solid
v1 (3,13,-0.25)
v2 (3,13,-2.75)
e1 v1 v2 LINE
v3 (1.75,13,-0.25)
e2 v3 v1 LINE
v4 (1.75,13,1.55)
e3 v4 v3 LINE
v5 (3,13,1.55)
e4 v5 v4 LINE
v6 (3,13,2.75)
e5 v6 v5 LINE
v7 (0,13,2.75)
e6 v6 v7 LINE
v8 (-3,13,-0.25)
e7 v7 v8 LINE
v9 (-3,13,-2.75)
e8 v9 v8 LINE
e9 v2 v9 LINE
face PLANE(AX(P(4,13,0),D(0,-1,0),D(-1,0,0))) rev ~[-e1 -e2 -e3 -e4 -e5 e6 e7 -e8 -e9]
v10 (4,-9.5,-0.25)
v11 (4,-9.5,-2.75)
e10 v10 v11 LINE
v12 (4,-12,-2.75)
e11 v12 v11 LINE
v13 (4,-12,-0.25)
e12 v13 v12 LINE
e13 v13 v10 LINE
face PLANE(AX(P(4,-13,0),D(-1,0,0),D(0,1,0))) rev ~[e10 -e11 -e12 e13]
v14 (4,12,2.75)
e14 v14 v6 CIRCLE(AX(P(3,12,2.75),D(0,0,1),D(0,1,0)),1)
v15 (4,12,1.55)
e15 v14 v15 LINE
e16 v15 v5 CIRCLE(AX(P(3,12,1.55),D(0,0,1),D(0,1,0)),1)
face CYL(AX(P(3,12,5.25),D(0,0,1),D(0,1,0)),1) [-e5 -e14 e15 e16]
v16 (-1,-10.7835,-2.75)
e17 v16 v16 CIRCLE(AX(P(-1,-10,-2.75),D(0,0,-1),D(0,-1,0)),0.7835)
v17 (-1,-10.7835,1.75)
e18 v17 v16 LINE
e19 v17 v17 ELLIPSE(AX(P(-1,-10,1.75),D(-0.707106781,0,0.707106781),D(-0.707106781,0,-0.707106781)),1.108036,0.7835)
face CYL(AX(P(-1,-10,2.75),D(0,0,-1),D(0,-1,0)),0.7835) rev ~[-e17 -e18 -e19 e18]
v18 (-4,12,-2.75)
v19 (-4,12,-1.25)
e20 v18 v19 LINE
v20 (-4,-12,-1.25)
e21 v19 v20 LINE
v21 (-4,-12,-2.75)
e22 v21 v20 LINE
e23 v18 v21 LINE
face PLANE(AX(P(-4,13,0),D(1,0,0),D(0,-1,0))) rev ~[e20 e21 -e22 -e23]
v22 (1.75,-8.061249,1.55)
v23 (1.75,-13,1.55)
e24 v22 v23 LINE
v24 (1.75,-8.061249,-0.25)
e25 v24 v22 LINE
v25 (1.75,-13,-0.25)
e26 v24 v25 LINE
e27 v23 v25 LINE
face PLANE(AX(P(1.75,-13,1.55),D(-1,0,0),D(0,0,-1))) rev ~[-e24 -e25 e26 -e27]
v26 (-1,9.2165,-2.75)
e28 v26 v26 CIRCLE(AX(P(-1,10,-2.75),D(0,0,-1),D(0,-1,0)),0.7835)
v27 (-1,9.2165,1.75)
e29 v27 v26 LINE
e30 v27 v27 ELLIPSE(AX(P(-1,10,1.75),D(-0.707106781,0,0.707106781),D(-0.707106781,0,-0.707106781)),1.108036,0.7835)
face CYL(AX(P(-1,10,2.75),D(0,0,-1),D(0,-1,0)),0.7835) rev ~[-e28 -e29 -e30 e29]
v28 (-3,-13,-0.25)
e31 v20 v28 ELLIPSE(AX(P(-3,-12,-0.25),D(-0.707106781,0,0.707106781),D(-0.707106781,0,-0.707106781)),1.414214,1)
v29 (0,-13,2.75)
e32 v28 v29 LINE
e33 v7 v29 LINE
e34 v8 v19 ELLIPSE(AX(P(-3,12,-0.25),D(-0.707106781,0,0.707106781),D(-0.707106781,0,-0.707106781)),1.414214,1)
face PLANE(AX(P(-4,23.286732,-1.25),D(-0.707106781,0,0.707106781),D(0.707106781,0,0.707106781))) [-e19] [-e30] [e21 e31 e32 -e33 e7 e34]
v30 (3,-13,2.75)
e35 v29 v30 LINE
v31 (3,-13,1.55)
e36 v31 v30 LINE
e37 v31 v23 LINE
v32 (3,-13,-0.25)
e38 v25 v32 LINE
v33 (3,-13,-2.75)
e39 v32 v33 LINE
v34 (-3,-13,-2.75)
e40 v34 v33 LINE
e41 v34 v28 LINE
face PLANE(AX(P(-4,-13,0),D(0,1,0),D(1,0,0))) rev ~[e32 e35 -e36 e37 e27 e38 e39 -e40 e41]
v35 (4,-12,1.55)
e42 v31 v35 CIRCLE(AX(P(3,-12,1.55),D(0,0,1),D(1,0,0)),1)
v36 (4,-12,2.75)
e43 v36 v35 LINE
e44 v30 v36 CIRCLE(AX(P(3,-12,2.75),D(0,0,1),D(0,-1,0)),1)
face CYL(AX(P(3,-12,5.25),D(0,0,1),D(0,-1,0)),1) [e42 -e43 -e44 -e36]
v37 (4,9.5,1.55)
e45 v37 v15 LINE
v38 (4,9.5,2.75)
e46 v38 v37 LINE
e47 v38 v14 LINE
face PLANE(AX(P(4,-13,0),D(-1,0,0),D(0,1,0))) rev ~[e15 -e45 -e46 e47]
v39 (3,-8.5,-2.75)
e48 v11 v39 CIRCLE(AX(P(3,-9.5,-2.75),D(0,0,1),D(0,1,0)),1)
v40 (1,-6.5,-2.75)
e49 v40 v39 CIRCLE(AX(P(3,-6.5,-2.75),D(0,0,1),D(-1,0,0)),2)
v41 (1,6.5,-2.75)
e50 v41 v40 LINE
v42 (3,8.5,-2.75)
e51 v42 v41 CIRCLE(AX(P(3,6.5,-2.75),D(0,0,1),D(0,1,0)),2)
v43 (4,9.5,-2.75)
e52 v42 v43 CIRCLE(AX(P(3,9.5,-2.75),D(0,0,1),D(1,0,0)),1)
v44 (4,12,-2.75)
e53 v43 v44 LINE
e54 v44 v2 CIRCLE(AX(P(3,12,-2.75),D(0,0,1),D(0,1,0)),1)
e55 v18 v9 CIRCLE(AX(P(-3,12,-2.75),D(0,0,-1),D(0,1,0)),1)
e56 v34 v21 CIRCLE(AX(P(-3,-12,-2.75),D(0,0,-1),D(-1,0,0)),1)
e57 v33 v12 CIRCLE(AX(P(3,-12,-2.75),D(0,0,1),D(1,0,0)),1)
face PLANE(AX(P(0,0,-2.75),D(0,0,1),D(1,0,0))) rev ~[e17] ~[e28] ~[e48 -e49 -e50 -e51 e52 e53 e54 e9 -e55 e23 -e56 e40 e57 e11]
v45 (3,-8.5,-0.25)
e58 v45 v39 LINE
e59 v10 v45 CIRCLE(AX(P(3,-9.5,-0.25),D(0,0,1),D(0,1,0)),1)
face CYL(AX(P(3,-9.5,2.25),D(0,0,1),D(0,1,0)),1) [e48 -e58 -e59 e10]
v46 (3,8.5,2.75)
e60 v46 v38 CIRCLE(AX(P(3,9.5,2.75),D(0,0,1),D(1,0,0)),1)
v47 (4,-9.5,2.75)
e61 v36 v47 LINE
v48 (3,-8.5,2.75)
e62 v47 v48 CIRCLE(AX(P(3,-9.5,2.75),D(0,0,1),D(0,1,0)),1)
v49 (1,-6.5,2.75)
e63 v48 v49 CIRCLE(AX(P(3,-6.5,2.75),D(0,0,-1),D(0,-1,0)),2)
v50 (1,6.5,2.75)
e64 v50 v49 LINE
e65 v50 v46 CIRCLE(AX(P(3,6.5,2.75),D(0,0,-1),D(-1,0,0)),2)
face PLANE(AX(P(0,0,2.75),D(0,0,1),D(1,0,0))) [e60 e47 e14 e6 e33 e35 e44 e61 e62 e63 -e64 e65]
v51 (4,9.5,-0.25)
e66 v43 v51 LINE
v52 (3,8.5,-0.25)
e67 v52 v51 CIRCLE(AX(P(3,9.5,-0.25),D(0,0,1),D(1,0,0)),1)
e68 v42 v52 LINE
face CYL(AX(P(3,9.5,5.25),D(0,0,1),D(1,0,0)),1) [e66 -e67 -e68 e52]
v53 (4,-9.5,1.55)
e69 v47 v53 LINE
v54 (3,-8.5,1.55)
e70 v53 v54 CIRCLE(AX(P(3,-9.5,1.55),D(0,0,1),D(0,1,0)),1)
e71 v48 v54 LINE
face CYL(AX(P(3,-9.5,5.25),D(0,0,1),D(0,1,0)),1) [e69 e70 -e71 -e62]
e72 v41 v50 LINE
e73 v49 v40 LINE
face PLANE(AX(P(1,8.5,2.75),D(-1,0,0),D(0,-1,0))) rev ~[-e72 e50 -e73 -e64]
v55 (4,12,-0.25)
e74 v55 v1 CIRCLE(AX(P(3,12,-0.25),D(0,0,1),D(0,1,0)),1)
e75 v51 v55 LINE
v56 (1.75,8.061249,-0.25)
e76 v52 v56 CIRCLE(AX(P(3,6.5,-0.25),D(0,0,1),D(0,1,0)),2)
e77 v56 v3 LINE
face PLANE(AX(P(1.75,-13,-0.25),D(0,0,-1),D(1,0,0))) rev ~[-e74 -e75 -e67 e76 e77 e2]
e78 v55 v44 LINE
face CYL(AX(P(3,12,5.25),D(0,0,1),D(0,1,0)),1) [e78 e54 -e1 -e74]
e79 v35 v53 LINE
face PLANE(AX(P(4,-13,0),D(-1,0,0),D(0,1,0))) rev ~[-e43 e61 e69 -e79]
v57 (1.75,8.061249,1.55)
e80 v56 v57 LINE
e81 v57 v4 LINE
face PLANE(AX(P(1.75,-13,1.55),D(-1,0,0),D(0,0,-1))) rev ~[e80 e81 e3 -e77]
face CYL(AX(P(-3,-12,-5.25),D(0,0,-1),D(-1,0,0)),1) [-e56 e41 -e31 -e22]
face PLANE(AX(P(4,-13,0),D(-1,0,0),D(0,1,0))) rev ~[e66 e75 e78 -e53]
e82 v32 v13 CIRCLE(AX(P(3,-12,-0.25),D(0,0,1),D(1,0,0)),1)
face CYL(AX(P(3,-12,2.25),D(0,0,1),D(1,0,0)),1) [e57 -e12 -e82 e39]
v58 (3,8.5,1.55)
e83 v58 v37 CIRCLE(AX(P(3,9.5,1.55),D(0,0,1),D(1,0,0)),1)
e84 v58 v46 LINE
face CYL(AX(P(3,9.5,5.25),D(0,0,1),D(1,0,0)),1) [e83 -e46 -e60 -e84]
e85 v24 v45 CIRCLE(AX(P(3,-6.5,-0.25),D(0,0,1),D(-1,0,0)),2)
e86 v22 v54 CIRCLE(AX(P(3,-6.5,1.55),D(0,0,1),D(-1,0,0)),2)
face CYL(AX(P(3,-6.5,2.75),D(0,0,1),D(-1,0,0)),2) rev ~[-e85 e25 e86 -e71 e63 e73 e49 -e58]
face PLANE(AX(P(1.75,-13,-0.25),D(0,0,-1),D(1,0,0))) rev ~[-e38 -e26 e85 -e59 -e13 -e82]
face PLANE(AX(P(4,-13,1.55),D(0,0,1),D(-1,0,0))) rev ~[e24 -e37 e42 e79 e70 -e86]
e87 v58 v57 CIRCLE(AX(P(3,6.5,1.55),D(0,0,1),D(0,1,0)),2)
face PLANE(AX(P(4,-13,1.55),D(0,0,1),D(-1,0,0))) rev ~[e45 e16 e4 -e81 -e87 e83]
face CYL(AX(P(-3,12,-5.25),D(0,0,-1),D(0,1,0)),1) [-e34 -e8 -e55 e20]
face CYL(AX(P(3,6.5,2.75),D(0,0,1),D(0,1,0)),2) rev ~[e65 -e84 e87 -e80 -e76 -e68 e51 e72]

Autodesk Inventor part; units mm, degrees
ref_plane "YZ Plane" through (0, 0, 0) normal (1, 0, 0) x (0, 1, 0)
ref_plane "XZ Plane" through (0, 0, 0) normal (0, 1, 0) x (-1, 0, 0)
ref_plane "XY Plane" through (0, 0, 0) normal (0, 0, 1) x (1, 0, 0)
sketch "Sketch1" plane through (0, 0, 0) normal (0, 0, 1) x (1, 0, 0)
  line L0 (-4, 13) -> (-4, -13)
  line L1 (-4, -13) -> (4, -13)
  line L2 (4, -13) -> (4, 13)
  line L3 (4, 13) -> (-4, 13)
  line L4 (-1, -10) -> (-1, 10) construction
  circle A0 centre (-1, 10) radius 3 construction
  point P0 (0, 0)
  point P1 (0, 13)
  point P2 (-4, 0)
  point P3 (-1, 0)
  dimension "d0" = 26
  dimension "d2" = 20
  dimension "d5" = 5
extrude "Extrusion1" add sketch "Sketch1" along normal mid plane 5.5
sketch "Sketch2" plane through (0, 0, 2.75) normal (0, 0, 1) x (1, 0, 0)
  point P0 (0, 0)
  point P1 (-1, 10)
  point P2 (-1, -10)
hole "Hole1" at (-1, 10, 2.75) at (-1, -10, 2.75) direction (0, 0, -1) diameter 1.567 end through all thread size "M2x0.4" class "6H" standard "ANSI Metric M Profile"
sketch "Sketch3" plane through (-4, -13, 2.75) normal (0, -1, 0) x (1, 0, 0)
  line L0 (8, -5.5) -> (8, 0) projected
  line L1 (0, 0) -> (8, 0) projected
  line L2 (0, -5.5) -> (0, 0) projected
  line L3 (8, -5.5) -> (0, -5.5) projected
  line L4 (8, -5.5) -> (8, 0) projected
  line L5 (8, -1.2) -> (5.75, -1.2)
  line L6 (5.75, -1.2) -> (5.75, -3)
  line L7 (5.75, -3) -> (8, -3)
  line L8 (8, -3) -> (8, -1.2)
  point P0 (4, -2.75)
  dimension "d13" = 2.5
  dimension "d14" = 1.8
  dimension "d15" = 2.25
extrude "Extrusion2" cut sketch "Sketch3" against normal through all contours L7 L6 L5 L0
chamfer "Chamfer1" distance 4 angle 45 1 edges at (-4, 0, 2.75)
sketch "Sketch4" plane through (0, 0, 2.75) normal (0, 0, 1) x (1, 0, 0)
  line L0 (0, -13) -> (0, 13) projected
  line L1 (0, -13) -> (4, -13) projected
  line L2 (4, -13) -> (4, 13) projected
  line L3 (4, 13) -> (0, 13) projected
  line L4 (4, 13) -> (4, -13) projected
  line L5 (4, 8.5) -> (1, 8.5)
  line L6 (1, 8.5) -> (1, -8.5)
  line L7 (1, -8.5) -> (4, -8.5)
  line L8 (4, -8.5) -> (4, 8.5)
  line L9 (4, -13) -> (4, 13) projected
  point P0 (0, 0)
  point P1 (4, 0)
  dimension "d21" = 3
  dimension "d22" = 17
extrude "Extrusion3" cut sketch "Sketch4" against normal through all contours L7 L6 L5 L2
fillet "Fillet1" radius 2 2 edges at (1, 8.5, 0) (1, -8.5, 0)
fillet "Fillet1" radius 1 10 edges at (4, -8.5, 2.15) (4, -13, 2.15) (4, -13, -1.5) (4, -8.5, -1.5) (4, 13, 2.15) (4, 8.5, 2.15) (4, 8.5, -1.5) (4, 13, -1.5) (-4, 13, -2) (-4, -13, -2)
properties part number "Payload_CameraSupport" material "Aluminum"
